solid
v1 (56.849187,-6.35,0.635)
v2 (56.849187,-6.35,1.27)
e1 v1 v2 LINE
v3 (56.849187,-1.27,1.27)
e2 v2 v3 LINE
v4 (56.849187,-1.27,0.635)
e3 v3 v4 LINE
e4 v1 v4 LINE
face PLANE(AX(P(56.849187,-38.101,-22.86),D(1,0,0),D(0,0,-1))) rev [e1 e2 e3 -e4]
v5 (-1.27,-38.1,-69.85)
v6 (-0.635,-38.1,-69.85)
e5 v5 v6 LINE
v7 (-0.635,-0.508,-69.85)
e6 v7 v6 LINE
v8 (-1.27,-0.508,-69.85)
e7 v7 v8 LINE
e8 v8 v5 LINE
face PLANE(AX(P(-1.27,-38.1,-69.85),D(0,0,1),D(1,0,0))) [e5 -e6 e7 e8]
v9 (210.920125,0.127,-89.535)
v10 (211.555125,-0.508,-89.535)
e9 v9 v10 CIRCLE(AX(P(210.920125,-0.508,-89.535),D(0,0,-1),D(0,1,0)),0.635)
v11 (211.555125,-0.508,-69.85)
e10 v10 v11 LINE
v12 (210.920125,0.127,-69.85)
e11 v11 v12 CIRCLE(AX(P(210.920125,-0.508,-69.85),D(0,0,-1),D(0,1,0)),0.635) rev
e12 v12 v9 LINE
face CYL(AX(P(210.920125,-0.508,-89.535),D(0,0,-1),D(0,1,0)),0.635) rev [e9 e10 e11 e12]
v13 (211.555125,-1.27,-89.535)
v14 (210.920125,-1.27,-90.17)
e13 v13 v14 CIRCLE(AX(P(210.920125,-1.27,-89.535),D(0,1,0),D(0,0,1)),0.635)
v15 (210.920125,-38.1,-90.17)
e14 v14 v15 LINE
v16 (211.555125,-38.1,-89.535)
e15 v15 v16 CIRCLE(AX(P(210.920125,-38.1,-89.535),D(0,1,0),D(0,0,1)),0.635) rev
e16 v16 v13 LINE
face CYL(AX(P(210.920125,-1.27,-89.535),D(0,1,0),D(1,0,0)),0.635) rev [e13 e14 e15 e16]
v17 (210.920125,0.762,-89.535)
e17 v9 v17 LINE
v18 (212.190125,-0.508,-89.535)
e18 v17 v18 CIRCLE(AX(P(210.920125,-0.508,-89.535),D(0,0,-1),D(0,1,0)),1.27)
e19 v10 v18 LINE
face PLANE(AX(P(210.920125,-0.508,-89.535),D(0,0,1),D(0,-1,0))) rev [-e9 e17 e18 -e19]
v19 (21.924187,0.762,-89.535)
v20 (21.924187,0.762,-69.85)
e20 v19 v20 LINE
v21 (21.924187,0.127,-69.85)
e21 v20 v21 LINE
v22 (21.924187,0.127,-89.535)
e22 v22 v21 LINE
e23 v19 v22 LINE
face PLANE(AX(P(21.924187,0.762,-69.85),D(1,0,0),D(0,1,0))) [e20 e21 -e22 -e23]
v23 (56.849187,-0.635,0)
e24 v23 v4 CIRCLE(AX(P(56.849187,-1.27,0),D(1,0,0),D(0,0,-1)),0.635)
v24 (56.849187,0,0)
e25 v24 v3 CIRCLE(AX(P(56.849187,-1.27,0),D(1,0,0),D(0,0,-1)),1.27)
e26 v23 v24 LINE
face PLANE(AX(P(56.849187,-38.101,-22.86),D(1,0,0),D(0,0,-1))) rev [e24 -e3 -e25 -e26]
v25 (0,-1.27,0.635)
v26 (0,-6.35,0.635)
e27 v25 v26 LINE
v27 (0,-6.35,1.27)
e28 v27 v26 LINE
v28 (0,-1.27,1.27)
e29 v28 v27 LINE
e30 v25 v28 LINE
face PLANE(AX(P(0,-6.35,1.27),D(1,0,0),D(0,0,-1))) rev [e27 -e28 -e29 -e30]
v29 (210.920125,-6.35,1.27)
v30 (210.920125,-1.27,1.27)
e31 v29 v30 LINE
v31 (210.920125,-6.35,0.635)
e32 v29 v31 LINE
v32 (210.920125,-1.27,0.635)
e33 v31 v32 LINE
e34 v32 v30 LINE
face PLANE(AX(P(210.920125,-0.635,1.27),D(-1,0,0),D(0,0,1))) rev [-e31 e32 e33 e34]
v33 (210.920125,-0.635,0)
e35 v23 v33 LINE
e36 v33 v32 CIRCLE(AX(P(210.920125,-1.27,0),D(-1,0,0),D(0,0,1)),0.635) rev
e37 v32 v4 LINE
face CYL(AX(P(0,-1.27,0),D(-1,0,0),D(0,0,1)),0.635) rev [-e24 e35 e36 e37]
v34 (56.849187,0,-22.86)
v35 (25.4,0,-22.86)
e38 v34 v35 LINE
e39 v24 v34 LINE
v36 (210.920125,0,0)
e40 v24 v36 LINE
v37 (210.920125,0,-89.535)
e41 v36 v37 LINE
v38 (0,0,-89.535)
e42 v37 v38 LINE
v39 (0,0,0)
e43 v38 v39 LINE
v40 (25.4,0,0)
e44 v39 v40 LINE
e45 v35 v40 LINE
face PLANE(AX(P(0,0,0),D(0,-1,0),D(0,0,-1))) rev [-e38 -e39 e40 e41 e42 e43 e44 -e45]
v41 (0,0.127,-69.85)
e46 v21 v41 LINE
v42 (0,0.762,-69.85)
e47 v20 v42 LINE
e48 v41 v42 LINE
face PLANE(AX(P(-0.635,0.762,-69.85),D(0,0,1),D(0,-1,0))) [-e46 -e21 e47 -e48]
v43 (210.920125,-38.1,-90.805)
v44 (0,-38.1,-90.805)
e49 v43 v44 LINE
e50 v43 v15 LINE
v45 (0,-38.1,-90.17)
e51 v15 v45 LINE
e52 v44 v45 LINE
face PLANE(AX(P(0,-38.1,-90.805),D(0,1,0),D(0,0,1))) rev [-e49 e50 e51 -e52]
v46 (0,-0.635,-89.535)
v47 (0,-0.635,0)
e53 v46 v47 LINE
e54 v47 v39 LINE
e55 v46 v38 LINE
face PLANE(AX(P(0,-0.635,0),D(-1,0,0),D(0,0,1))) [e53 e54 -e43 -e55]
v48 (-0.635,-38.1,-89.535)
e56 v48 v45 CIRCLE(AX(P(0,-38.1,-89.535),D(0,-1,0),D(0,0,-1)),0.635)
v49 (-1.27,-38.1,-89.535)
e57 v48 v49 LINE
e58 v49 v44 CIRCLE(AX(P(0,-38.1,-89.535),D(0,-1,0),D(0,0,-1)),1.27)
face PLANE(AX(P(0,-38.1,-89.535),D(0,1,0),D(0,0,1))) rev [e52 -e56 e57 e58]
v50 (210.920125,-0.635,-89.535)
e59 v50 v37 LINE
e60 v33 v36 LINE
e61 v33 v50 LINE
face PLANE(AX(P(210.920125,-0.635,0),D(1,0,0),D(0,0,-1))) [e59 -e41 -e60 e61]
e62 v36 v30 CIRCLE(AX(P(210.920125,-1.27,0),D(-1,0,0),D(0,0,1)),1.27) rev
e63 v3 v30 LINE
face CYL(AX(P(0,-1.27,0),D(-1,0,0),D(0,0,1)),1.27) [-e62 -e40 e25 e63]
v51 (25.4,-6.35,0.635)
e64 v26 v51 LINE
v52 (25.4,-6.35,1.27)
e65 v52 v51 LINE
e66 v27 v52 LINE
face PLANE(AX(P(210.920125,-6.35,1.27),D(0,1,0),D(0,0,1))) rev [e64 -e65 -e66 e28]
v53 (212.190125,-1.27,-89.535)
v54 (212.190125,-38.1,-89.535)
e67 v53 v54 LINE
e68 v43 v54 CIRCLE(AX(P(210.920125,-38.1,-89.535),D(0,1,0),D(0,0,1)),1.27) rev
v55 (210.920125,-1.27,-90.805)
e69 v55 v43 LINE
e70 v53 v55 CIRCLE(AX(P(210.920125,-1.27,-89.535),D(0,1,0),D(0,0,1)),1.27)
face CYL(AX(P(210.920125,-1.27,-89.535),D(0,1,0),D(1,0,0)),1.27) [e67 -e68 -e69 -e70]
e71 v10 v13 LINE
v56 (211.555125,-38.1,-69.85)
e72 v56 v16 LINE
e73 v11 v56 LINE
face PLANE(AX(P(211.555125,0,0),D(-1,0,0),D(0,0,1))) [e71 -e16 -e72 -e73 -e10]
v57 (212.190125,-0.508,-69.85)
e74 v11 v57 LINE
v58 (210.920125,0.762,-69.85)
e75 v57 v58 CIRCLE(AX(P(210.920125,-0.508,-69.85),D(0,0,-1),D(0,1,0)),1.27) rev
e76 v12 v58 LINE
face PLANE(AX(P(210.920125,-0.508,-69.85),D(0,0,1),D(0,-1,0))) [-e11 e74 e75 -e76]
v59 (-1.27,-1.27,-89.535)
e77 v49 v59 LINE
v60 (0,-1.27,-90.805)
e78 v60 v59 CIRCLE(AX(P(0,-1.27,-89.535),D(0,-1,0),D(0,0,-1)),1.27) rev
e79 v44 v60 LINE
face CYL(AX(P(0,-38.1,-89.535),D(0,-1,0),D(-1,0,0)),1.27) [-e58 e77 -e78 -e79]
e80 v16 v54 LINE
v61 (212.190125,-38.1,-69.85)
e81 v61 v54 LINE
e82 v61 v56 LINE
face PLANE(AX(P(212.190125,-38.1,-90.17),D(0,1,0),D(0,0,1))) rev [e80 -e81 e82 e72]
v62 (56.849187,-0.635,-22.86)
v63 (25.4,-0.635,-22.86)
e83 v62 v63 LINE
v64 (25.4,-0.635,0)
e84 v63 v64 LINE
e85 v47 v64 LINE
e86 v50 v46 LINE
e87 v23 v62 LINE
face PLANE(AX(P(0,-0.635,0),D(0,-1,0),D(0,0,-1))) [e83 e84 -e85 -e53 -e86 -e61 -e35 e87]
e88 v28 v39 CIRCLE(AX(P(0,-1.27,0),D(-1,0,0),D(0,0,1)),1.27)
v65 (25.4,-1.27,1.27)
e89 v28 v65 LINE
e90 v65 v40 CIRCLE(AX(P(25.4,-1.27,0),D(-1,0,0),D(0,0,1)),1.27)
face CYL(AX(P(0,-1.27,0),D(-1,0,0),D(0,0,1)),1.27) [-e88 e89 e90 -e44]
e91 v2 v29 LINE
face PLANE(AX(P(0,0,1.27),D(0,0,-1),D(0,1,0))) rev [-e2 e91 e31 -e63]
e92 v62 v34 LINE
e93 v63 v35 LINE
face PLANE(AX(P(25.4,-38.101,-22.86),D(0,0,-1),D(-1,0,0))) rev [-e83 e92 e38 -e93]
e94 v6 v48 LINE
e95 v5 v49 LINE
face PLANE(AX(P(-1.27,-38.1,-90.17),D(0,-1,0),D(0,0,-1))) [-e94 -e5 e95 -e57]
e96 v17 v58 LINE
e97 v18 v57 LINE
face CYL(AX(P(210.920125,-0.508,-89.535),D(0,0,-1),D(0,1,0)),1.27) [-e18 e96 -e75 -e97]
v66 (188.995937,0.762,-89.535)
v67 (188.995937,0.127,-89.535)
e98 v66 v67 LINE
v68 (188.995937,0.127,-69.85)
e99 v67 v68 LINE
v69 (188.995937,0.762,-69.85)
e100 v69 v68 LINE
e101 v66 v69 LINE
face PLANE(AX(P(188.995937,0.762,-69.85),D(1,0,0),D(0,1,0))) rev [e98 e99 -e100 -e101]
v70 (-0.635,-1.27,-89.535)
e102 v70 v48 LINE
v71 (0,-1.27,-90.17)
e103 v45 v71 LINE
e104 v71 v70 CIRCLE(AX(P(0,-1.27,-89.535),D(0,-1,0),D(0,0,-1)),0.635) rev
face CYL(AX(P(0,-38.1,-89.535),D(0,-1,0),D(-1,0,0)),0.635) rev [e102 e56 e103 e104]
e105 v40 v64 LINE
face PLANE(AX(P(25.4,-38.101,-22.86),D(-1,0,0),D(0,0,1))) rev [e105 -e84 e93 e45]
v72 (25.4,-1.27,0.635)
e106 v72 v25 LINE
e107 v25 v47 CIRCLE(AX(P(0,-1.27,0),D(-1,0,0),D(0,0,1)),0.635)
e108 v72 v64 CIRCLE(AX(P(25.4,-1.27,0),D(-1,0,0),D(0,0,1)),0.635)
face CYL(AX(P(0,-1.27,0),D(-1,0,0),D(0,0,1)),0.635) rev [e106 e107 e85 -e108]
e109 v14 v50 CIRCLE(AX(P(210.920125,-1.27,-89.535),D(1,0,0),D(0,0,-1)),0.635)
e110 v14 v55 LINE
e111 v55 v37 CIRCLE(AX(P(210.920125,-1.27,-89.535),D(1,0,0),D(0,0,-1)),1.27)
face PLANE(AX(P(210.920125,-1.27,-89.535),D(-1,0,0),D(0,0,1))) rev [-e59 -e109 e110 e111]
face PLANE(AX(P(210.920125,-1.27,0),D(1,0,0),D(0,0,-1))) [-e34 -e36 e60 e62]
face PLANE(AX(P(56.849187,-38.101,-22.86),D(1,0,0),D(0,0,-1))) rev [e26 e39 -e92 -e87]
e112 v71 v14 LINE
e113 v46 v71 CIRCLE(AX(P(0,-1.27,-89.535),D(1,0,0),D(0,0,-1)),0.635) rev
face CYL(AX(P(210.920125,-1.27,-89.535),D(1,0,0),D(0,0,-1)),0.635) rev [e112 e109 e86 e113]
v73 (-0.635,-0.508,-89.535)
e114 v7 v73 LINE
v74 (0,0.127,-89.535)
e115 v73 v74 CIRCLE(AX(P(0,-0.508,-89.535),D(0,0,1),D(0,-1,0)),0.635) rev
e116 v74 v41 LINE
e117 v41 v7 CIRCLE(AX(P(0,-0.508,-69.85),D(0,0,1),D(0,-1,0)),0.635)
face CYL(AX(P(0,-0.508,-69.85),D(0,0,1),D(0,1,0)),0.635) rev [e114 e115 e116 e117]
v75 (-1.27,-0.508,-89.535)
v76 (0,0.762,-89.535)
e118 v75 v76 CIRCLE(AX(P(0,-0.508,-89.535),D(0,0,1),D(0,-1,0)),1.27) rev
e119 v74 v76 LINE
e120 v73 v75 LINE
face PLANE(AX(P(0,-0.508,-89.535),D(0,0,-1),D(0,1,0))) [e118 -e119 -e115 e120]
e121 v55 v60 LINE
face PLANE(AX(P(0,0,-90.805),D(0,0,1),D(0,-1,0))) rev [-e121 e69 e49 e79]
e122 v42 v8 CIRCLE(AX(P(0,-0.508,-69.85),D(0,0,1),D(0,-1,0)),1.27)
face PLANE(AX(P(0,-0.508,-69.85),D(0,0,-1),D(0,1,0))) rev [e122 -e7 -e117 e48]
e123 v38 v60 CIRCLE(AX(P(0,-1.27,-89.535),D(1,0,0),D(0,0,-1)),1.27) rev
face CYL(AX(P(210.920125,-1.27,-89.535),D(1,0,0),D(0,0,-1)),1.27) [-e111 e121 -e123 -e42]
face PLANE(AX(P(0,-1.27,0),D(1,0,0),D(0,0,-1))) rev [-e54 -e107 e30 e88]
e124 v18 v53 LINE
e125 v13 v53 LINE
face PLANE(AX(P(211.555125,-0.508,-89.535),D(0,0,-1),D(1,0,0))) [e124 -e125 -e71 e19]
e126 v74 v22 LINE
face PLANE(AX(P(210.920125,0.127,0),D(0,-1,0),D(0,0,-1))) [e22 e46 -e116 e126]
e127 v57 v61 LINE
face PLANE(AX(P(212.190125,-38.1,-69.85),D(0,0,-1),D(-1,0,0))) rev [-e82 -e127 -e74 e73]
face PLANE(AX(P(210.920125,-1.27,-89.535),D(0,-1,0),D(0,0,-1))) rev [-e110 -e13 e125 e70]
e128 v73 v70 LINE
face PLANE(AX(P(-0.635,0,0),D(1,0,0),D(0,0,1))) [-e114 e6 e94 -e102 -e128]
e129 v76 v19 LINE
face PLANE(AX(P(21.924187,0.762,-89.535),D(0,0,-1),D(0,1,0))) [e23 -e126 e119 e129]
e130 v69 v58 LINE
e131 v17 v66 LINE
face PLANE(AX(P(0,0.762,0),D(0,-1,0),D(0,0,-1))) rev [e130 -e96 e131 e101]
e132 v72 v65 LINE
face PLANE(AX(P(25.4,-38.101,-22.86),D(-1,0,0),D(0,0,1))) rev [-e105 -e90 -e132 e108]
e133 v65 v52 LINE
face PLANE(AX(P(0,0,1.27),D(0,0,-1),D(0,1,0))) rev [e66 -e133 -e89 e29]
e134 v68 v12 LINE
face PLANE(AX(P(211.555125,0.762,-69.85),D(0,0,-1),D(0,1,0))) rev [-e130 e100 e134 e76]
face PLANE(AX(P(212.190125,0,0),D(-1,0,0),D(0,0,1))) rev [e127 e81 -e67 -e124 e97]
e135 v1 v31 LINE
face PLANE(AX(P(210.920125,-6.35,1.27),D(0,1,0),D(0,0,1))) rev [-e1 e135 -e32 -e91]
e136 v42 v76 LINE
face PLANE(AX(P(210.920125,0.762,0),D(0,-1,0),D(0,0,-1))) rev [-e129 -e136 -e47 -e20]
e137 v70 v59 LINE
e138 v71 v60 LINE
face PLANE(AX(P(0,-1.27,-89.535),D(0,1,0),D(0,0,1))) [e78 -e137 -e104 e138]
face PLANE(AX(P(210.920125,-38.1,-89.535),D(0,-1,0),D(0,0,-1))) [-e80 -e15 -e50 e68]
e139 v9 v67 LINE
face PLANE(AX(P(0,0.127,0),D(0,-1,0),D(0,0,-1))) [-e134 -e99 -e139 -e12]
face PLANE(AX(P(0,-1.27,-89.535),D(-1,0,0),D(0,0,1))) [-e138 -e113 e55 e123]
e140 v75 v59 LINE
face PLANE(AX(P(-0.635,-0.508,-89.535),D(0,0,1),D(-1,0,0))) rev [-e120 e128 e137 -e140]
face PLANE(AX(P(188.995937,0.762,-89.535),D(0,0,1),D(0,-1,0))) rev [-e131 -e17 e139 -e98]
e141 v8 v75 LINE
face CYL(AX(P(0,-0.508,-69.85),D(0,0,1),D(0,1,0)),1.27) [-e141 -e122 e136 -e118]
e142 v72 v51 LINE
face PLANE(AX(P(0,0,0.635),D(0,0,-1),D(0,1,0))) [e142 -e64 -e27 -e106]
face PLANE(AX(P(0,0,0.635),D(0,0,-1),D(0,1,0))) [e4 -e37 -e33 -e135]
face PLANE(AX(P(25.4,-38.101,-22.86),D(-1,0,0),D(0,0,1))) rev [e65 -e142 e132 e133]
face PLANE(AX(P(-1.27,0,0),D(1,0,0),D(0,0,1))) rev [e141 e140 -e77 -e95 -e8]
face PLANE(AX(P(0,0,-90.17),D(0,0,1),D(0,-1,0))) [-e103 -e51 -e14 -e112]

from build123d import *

# Parameters (mm, degrees)
SKETCH2_W                    = 210.920124673
SKETCH2_H                    = 90.17
BASE_FLANGE1_DEPTH           = 0.635
EDGE_FLANGE1_STRIP_W         = 3.81
EDGE_FLANGE1_STRIP_H         = 0.635
EDGE_FLANGE1_STRIP_CUT_DEPTH = 210.920124673
EDGE_FLANGE1_DEPTH           = 210.920124673
EDGE_FLANGE4_DEPTH           = 36.83
EDGE_FLANGE7_START           = -89.535
EDGE_FLANGE7_DEPTH           = 19.685
EDGE_FLANGE8_DEPTH           = 210.920124673
CUT_EXTRUDE1_REACH           = 235.927
SKETCH41_W                   = 31.449187445
SKETCH41_H                   = 25.469780901


# Read off the part's stored shape, not the designer's step: Edge-Flange7
# Sheet-metal steps are written as plain solids
with BuildPart() as part:
    # Sketch2 → Base-Flange1 (new body)
    with BuildSketch(Plane(origin=(0, 0, 0), x_dir=(1, 0, 0), z_dir=(0, 1, 0))):
        with Locations((105.460062337, 45.085)):
            Rectangle(SKETCH2_W, SKETCH2_H)
    extrude(amount=-BASE_FLANGE1_DEPTH)

    # Edge-Flange1 strip (across the edge) → Edge-Flange1 strip cut (cut)
    with BuildSketch(Plane(origin=(0, -0.635, -90.17), x_dir=(0, 0, 1), z_dir=(1, 0, 0))):
        with Locations((-1.27, -0.3175)):
            Rectangle(EDGE_FLANGE1_STRIP_W, EDGE_FLANGE1_STRIP_H)
    extrude(amount=EDGE_FLANGE1_STRIP_CUT_DEPTH, mode=Mode.SUBTRACT)

    # Edge-Flange1 section (across the edge) → Edge-Flange1 (add)
    with BuildSketch(Plane(origin=(0, -0.635, -90.17), x_dir=(0, 0, 1), z_dir=(1, 0, 0))):
        with BuildLine():
            Line((-0.635, 0.635), (-0.635, 37.465))
            Line((-0.635, 37.465), (0, 37.465))
            Line((0, 37.465), (0, 0.635))
            ThreePointArc((0, 0.635), (0.185987194, 0.185987194), (0.635, 0))
            Line((0.635, 0), (0.635, -0.635))
            ThreePointArc((0.635, -0.635), (-0.263025612, -0.263025612), (-0.635, 0.635))
        make_face()
    extrude(amount=EDGE_FLANGE1_DEPTH)

    # Edge-Flange4 section (across the edge) → Edge-Flange4 (add)
    with BuildSketch(Plane(origin=(211.555124673, -38.1, -90.17), x_dir=(-1, 0, 0), z_dir=(0, 1, 0))):
        with BuildLine():
            Line((-0.635, 0.635), (-0.635, 20.32))
            Line((-0.635, 20.32), (0, 20.32))
            Line((0, 20.32), (0, 0.635))
            ThreePointArc((0, 0.635), (0.185987194, 0.185987194), (0.635, 0))
            Line((0.635, 0), (0.635, -0.635))
            ThreePointArc((0.635, -0.635), (-0.263025612, -0.263025612), (-0.635, 0.635))
        make_face()
    edge_flange4 = extrude(amount=EDGE_FLANGE4_DEPTH)

    # Edge-Flange7 outline → Edge-Flange7 (add)
    with BuildSketch(Plane.XY.offset(EDGE_FLANGE7_START)):
        with BuildLine():
            ThreePointArc((212.190124673, -0.508), (211.818150285, 0.390025612), (210.920124673, 0.762))
            Line((210.920124673, 0.762), (188.995937227, 0.762))
            Line((188.995937227, 0.762), (188.995937227, 0.127))
            Line((188.995937227, 0.127), (210.920124673, 0.127))
            ThreePointArc((210.920124673, 0.127), (211.369137479, -0.058987194), (211.555124673, -0.508))
            Line((211.555124673, -0.508), (211.555124673, -1.27))
            Line((211.555124673, -1.27), (212.190124673, -1.27))
            Line((212.190124673, -1.27), (212.190124673, -0.508))
        make_face()
    edge_flange7 = extrude(amount=EDGE_FLANGE7_DEPTH)

    # Mirror1: Edge-Flange4, Edge-Flange7 across plane
    add(edge_flange4.mirror(Plane.ZY.offset(-105.460062336)))
    add(edge_flange7.mirror(Plane.ZY.offset(-105.460062336)))

    # Edge-Flange8 section (across the edge) → Edge-Flange8 (add)
    with BuildSketch(Plane(origin=(210.920124673, -0.635, 0.635), x_dir=(0, 0, -1), z_dir=(-1, 0, 0))):
        with BuildLine():
            Line((-0.635, 0.635), (-0.635, 5.715))
            Line((-0.635, 5.715), (0, 5.715))
            Line((0, 5.715), (0, 0.635))
            ThreePointArc((0, 0.635), (0.185987194, 0.185987194), (0.635, 0))
            Line((0.635, 0), (0.635, -0.635))
            ThreePointArc((0.635, -0.635), (-0.263025612, -0.263025612), (-0.635, 0.635))
        make_face()
    extrude(amount=EDGE_FLANGE8_DEPTH)

    # Sketch41 → Cut-Extrude1 (cut, up to next)
    with BuildSketch(Plane(origin=(0, 0, 0), x_dir=(1, 0, 0), z_dir=(0, 1, 0)), mode=Mode.PRIVATE) as cut_extrude1_sk1:
        with Locations((41.124593723, 10.12510955)):
            Rectangle(SKETCH41_W, SKETCH41_H)
    cut_extrude1_tool1 = extrude(cut_extrude1_sk1.sketch, amount=-CUT_EXTRUDE1_REACH, mode=Mode.PRIVATE) & part.part
    add(cut_extrude1_tool1.solids().sort_by_distance((41.124594, 0, -10.12511))[0], mode=Mode.SUBTRACT)


solid = part.part
